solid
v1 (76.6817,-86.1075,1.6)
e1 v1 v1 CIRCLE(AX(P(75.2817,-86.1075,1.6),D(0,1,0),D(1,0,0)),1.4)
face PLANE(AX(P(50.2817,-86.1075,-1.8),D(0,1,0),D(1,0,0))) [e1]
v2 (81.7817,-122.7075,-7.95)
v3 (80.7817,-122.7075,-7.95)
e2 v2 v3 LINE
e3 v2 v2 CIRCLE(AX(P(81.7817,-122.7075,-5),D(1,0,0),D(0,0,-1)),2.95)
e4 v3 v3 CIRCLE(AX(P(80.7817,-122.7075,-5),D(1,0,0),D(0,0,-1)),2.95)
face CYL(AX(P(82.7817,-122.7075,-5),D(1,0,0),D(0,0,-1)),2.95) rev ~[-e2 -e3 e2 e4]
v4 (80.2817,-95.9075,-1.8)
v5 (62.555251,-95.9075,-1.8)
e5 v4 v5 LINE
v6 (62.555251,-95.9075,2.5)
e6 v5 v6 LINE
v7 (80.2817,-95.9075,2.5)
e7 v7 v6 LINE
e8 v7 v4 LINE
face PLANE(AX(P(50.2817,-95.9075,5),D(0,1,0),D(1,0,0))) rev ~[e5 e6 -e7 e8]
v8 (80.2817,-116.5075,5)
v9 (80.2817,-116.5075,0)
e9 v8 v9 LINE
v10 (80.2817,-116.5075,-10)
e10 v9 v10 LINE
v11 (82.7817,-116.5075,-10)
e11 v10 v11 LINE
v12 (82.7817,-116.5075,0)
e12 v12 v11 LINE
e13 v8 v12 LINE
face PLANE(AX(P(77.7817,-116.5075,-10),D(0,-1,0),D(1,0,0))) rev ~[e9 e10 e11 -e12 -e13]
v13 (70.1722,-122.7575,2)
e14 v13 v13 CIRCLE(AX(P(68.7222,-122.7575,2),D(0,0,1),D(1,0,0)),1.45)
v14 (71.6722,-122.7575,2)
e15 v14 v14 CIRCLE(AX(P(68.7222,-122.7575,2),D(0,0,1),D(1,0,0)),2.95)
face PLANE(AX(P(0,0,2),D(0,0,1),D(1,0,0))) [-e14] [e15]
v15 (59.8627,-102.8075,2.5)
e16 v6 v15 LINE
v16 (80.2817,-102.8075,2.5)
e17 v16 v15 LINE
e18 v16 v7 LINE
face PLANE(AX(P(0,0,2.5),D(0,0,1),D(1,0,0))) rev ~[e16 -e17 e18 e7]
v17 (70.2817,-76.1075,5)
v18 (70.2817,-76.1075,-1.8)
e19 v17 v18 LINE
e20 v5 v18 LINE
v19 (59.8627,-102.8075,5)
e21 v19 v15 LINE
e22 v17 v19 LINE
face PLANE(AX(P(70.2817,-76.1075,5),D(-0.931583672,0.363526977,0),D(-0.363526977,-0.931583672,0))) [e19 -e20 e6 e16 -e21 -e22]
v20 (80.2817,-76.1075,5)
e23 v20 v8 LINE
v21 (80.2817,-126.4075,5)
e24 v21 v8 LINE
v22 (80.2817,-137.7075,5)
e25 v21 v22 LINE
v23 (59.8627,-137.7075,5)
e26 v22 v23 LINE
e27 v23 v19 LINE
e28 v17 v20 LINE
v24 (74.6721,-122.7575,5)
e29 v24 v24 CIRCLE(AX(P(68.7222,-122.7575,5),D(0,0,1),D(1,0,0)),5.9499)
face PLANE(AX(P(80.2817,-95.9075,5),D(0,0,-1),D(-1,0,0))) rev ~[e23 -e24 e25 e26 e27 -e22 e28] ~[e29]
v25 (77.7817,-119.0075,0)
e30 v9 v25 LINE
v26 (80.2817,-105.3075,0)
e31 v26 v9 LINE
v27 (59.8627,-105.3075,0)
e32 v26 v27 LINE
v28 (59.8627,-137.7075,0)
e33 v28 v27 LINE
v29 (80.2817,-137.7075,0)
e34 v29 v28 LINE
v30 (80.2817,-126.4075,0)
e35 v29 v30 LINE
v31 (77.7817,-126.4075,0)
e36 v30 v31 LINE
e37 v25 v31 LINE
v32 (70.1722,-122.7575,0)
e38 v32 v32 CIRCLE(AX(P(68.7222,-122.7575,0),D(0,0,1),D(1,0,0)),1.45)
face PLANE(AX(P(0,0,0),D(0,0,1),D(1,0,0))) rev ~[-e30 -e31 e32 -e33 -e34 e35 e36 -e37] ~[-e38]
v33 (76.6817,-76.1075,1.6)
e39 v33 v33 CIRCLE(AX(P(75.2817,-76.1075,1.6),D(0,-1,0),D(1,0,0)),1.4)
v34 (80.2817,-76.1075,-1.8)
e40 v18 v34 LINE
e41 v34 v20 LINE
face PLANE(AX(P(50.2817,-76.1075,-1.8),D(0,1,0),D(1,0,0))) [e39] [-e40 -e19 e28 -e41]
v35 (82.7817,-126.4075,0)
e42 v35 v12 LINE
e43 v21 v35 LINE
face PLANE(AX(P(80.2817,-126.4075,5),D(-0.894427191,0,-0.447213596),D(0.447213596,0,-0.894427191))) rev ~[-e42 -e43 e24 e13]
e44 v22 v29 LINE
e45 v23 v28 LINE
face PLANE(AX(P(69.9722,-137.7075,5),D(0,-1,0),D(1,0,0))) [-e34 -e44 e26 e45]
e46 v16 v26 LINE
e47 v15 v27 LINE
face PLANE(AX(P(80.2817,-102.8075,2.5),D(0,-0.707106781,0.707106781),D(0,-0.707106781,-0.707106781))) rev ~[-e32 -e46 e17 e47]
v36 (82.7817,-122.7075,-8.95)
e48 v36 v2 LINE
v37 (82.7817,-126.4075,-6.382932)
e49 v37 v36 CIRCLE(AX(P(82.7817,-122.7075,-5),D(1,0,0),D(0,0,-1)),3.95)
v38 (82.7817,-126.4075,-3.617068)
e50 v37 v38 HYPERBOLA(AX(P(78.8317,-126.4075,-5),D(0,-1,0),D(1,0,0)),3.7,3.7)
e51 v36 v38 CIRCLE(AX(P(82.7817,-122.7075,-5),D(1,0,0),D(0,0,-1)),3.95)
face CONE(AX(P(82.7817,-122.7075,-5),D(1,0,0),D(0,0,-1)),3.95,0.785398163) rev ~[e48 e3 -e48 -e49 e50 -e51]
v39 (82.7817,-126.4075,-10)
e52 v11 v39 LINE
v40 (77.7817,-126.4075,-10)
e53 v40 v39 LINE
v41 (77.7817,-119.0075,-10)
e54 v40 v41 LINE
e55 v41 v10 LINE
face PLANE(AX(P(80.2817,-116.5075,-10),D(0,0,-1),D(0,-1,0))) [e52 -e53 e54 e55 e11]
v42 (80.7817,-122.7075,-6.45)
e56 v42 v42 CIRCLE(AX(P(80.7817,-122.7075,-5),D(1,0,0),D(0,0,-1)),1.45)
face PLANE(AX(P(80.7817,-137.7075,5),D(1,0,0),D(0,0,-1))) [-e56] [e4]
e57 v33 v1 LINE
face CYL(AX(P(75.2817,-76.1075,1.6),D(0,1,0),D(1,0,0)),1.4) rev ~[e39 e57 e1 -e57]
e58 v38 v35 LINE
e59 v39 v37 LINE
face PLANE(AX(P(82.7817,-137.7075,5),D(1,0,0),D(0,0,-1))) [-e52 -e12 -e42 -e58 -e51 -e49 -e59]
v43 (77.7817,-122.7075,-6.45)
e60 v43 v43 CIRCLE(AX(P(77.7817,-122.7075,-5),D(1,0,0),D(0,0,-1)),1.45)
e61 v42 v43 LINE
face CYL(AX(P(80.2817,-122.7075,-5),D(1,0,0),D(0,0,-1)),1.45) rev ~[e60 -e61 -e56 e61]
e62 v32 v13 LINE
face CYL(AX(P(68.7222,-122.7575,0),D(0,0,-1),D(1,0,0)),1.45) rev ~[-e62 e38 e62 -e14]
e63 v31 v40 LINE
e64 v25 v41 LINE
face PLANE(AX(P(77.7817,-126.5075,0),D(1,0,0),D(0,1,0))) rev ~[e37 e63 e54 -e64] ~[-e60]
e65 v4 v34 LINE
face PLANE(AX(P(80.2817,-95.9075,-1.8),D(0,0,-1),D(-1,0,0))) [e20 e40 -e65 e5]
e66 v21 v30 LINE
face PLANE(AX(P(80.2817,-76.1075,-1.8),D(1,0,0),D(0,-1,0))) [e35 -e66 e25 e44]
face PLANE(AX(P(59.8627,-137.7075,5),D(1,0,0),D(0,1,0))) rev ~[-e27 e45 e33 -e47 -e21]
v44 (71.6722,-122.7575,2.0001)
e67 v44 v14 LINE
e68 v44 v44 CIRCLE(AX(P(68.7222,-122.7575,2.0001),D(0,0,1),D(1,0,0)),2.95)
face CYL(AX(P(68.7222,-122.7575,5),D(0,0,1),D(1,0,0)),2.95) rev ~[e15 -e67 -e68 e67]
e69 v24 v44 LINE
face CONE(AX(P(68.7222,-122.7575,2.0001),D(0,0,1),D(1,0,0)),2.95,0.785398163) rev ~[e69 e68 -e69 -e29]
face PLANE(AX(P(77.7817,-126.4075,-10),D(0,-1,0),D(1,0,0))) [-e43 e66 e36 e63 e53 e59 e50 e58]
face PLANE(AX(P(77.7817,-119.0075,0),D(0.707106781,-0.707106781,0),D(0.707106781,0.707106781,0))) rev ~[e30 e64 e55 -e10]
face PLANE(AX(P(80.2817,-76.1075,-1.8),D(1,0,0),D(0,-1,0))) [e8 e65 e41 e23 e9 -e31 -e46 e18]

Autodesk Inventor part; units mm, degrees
ref_plane "YZ Plane" through (0, 0, 0) normal (1, 0, 0) x (0, 1, 0)
ref_plane "XZ Plane" through (0, 0, 0) normal (0, 1, 0) x (-1, 0, 0)
ref_plane "XY Plane" through (0, 0, 0) normal (0, 0, 1) x (1, 0, 0)
sketch "Esboço1" plane through (0, 0, 0) normal (0, 0, 1) x (1, 0, 0)
  line L0 (80.2817, -126.5075) -> (80.2817, -137.9075)
  line L1 (80.2817, -137.9075) -> (59.6627, -137.9075)
  line L2 (77.7817, -126.5075) -> (80.2817, -126.5075)
  line L3 (77.7817, -119.0075) -> (77.7817, -126.5075)
  line L4 (59.6627, -137.9075) -> (59.6627, -102.6075)
  line L5 (80.2817, -116.5075) -> (77.7817, -119.0075)
  line L6 (59.6627, -102.6075) -> (80.2817, -102.6075)
  line L7 (80.2817, -105.1075) -> (80.2817, -116.5075)
  line L8 (80.2817, -102.6075) -> (80.2817, -105.1075)
  line L9 (77.7817, -122.7575) -> (59.6627, -122.7575)
  circle A0 centre (68.7222, -122.7575) radius 1.45
  point P0 (0, 0)
  dimension "d65" = 2.9
extrude "Extrusão1" add sketch "Esboço1" along normal blind 5 contours L0 L1 L4 L9 A0 L3 L2 | L9 A0 L4 L6 L8 L7 L5 L3
sketch "Esboço2" plane through (0, 0, 5) normal (0, 0, 1) x (1, 0, 0)
  line L0 (69.9722, -137.7075) -> (80.6667, -137.7075)
  line L1 (80.6667, -137.7075) -> (80.6667, -138.3178)
  line L2 (80.6667, -138.3178) -> (69.9722, -138.3178)
  line L3 (69.9722, -137.7075) -> (59.8627, -137.7075)
  line L4 (59.358, -137.7075) -> (59.358, -138.3178)
  line L5 (59.358, -138.3178) -> (69.9722, -138.3178)
  line L6 (69.9722, -102.8075) -> (80.6667, -102.8075)
  line L7 (80.6667, -102.8075) -> (80.6667, -102.3974)
  line L8 (80.6667, -102.3974) -> (69.9722, -102.3974)
  line L9 (69.9722, -102.8075) -> (59.8627, -102.8075)
  line L10 (59.358, -102.8075) -> (59.358, -102.3974)
  line L11 (59.358, -102.3974) -> (69.9722, -102.3974)
  line L12 (59.358, -102.6075) -> (59.358, -138.3178)
  line L13 (59.358, -138.3178) -> (59.8627, -138.3178)
  line L14 (59.8627, -137.7075) -> (59.8627, -102.8075)
  point P0 (0, 0)
extrude "Extrusão2" cut sketch "Esboço2" against normal through all
sketch "Esboço3" plane through (80.2817, -116.5075, 5) normal (1, 0, 0) x (0, 0, -1)
  line L0 (5, 0) -> (5, 13.7) projected
  line L1 (5, 13.7) -> (2.5, 13.7)
  line L2 (5, 13.7) -> (0, 13.7) projected
  line L3 (5, 13.7) -> (5, 11.2)
  line L4 (2.5, 13.7) -> (5, 11.2)
  point P0 (5, 116.5075)
  dimension "d15" = 2.5
  dimension "d16" = 2.5
extrude "Extrusão3" cut sketch "Esboço3" against normal through all
sketch "Esboço4" plane through (0, 0, 0) normal (0, 0, -1) x (-1, 0, 0)
  line L0 (-77.7817, -119.0075) -> (-80.2817, -116.5075) projected
  line L1 (-77.7817, -126.5075) -> (-77.7817, -119.0075) projected
  line L2 (-80.2817, -116.5075) -> (-77.7817, -119.0075)
  line L3 (-77.7817, -119.0075) -> (-77.7817, -126.5075)
  line L4 (-77.7817, -126.5075) -> (-80.2817, -126.5075)
  line L5 (-80.2817, -126.5075) -> (-80.2817, -116.5075)
  point P0 (0, 0)
extrude "Extrusão4" add sketch "Esboço4" along normal blind 10
sketch "Esboço5" plane through (0, 0, -10) normal (0, 0, -1) x (-1, 0, 0)
  line L0 (-77.7817, -119.0075) -> (-80.2817, -116.5075) projected
  line L1 (-80.2817, -116.5075) -> (-80.2817, -116.6075)
  line L2 (-80.2817, -116.6075) -> (-77.7817, -119.1075)
  line L3 (-80.2817, -116.5075) -> (-80.2817, -126.5075) projected
  line L4 (-80.2817, -116.5075) -> (-80.2817, -116.1602)
  line L5 (-80.2817, -116.5075) -> (-80.2817, -105.3075) projected
  line L6 (-80.2817, -116.1602) -> (-77.7817, -116.1602)
  line L7 (-77.7817, -116.1602) -> (-77.7817, -119.1075)
  line L8 (-80.2817, -126.5075) -> (-80.2817, -126.4075)
  line L9 (-80.2817, -126.4075) -> (-77.6383, -126.4075)
  line L10 (-77.6383, -126.4075) -> (-77.6383, -126.5963)
  line L11 (-77.6383, -126.5963) -> (-80.2817, -126.5963)
  line L12 (-80.2817, -126.5963) -> (-80.2817, -126.4075)
  point P0 (0, 0)
  dimension "d26" = 0.1
extrude "Extrusão5" cut sketch "Esboço5" against normal blind 10 contours L0 L4 L6 L7 | L9 L10 L11 L12 L3
sketch "Esboço6" plane through (0, 0, 5) normal (0, 0, 1) x (1, 0, 0)
  line L0 (80.2817, -126.5075) -> (77.7817, -126.5075) projected
  line L1 (80.2817, -126.5075) -> (77.7817, -126.5075)
  line L2 (77.7817, -119.0075) -> (80.2817, -116.5075) projected
  line L3 (77.7817, -126.5075) -> (77.7817, -119.0075)
  line L4 (77.7817, -119.0075) -> (80.2817, -116.5075)
  line L5 (80.2817, -116.5075) -> (80.2817, -126.5075)
  point P0 (0, 0)
extrude "Extrusão6" add sketch "Esboço6" against normal blind 5
sketch "Esboço7" plane through (80.2817, -137.7075, 5) normal (1, 0, 0) x (0, 0, -1)
  line L0 (5, 21.2) -> (15, 21.2) projected
  line L1 (15, 21.2) -> (15, 18.7)
  line L2 (15, 21.2) -> (15, 11.3) projected
  line L3 (5, 18.7) -> (5, 21.2) projected
  line L4 (15, 18.7) -> (5, 18.7)
  line L5 (5, 18.7) -> (5, 21.2)
  line L6 (5, 21.2) -> (15, 21.2)
  line L7 (15, 11.3) -> (5, 11.3) projected
  line L8 (5, 11.3) -> (15, 18.7)
  circle A0 centre (10, 15) radius 1.45
  point P0 (5, 137.7075)
  dimension "d31" = 2.5
  dimension "d32" = 2.9
extrude "Extrusão7" cut sketch "Esboço7" against normal blind 5 contours A0 L8 | L8 A0
sketch "Esboço8" plane through (0, 0, 5) normal (0, 0, 1) x (1, 0, 0)
  line L0 (80.2817, -137.7075) -> (80.2817, -102.8075) projected
  line L1 (80.2817, -102.8075) -> (80.2817, -95.9075)
  line L2 (80.2817, -95.9075) -> (50.2817, -95.9075)
  line L3 (50.2817, -95.9075) -> (50.2817, -102.8075)
  line L4 (80.2817, -102.8075) -> (59.8627, -102.8075) projected
  line L5 (50.2817, -102.8075) -> (80.2817, -102.8075)
  point P0 (0, 0)
  dimension "d35" = 6.9
  dimension "d36" = 30
extrude "Extrusão8" add sketch "Esboço8" against normal blind 2.5
sketch "Esboço10" plane through (50.2817, -95.9075, 5) normal (0, 1, 0) x (1, 0, 0)
  line L0 (30, 0) -> (30, 2.5) projected
  line L1 (30, 5) -> (30, 2.5) projected
  line L2 (30, 0) -> (30, 2.5)
  line L3 (30, 2.5) -> (30, 6.8)
  line L4 (30, 6.8) -> (0, 6.8)
  line L5 (0, 0) -> (0, 2.5) projected
  line L6 (0, 6.8) -> (0, 0)
  line L7 (0, 0) -> (30, 0)
  point P0 (-50.2817, 5)
  dimension "d39" = 4.3
extrude "Extrusão9" add sketch "Esboço10" along normal blind 2.5
sketch "Esboço11" plane through (50.2817, -93.4075, 5) normal (0, 1, 0) x (1, 0, 0)
  line L0 (30, 2.5) -> (30, 6.8) projected
  line L1 (30, 5) -> (30, 2.5) projected
  line L2 (30, 6.8) -> (30, 2.5)
  line L3 (0, 0) -> (0, 2.5) projected
  line L4 (30, 2.5) -> (0, 2.5)
  line L5 (0, 6.8) -> (0, 2.5) projected
  line L6 (0, 2.5) -> (0, 6.8)
  line L7 (0, 6.8) -> (30, 6.8)
  line L8 (0, 2.5) -> (30, 2.5)
  line L9 (30, 2.5) -> (30, 0)
  line L10 (30, 0) -> (0, 0)
  line L11 (0, 0) -> (0, 2.5)
  point P0 (-50.2817, 5)
  dimension "d42" = 4.3
extrude "Extrusão10" add sketch "Esboço11" along normal blind 12.3
sketch "Esboço12" plane through (80.2817, -95.9075, -1.8) normal (0, 0, -1) x (-1, 0, 0)
  line L0 (0, 14.8) -> (30, 14.8) projected
  line L1 (0, 14.8) -> (30, 14.8)
  line L2 (30, 14.8) -> (30, 19.8)
  line L3 (30, 19.8) -> (0, 19.8)
  line L4 (0, 19.8) -> (0, 14.8)
  point P0 (80.2817, 95.9075)
  dimension "d45" = 5
extrude "Extrusão11" add sketch "Esboço12" against normal blind 6.8
sketch "Esboço14" plane through (80.2817, -137.7075, 5) normal (1, 0, 0) x (0, 0, -1)
  line L0 (5, 18.7) -> (5, 21.2) projected
  line L1 (15, 21.2) -> (15, 11.3) projected
  line L2 (5, 21.2) -> (15, 21.2)
  line L3 (15, 21.2) -> (15, 11.3)
  line L4 (15, 11.3) -> (5, 11.3)
  line L5 (5, 11.3) -> (5, 21.2)
  circle A0 centre (10, 15) radius 1.45 projected
  circle A1 centre (10, 15) radius 1.45
  point P0 (5, 137.7075)
extrude "Extrusão13" add sketch "Esboço14" along normal blind 2.5
sketch "Esboço15" plane through (77.7817, -126.4075, -10) normal (0, -1, 0) x (1, 0, 0)
  line L0 (5, 10) -> (5, 0) projected
  line L1 (2.5, 15) -> (2.5, 10) projected
  line L2 (5, 10) -> (2.5, 10)
  line L3 (2.5, 10) -> (2.5, 15)
  line L4 (2.5, 15) -> (5, 10)
  point P0 (-77.7817, 10)
extrude "Extrusão14" add sketch "Esboço15" against normal blind 9.9
sketch "Esboço16" plane through (50.2817, -76.1075, -1.8) normal (0, 1, 0) x (1, 0, 0)
  line L0 (30, 0) -> (0, 0) projected
  line L1 (15, 0) -> (15, -6.8)
  line L2 (9.581, -6.8) -> (30, -6.8) projected
  line L3 (15, -3.4) -> (30, -3.4)
  line L4 (30, -3.4) -> (25, -3.4)
  circle A0 centre (25, -3.4) radius 1.4
  point P0 (-50.2817, -1.8)
  dimension "d92" = 5
  dimension "d99" = 2.8
extrude "Extrusão15" cut sketch "Esboço16" against normal blind 10
sketch "Esboço18" plane through (0, 0, 5) normal (0, 0, 1) x (1, 0, 0)
  line L0 (80.2817, -116.5075) -> (80.2817, -76.1075) projected
  line L1 (80.2817, -76.1075) -> (70.2817, -76.1075)
  line L2 (50.2817, -76.1075) -> (80.2817, -76.1075) projected
  line L3 (80.2817, -102.8075) -> (59.8627, -102.8075) projected
  line L4 (70.2817, -76.1075) -> (59.8627, -102.8075)
  line L5 (59.8627, -102.8075) -> (80.2817, -102.8075)
  line L6 (80.2817, -102.8075) -> (80.2817, -76.1075)
  line L7 (70.2817, -76.1075) -> (50.2817, -76.1075)
  line L8 (50.2817, -76.1075) -> (50.2817, -102.8075) projected
  line L9 (50.2817, -102.8075) -> (59.8627, -102.8075)
  line L10 (50.2817, -102.8075) -> (50.2817, -76.1075)
  point P0 (0, 0)
  dimension "d96" = 10
extrude "Extrusão16" cut sketch "Esboço18" against normal through all contours L9 L8 L2 L4
sketch "Esboço19" plane through (0, 0, 5) normal (0, 0, 1) x (1, 0, 0)
  circle A0 centre (68.7222, -122.7575) radius 1.45 projected
  circle A1 centre (68.7222, -122.7575) radius 1.45
  circle A2 centre (68.7222, -122.7575) radius 2.95
  point P0 (0, 0)
  dimension "d100" = 5.9
extrude "Extrusão17" cut sketch "Esboço19" against normal blind 3
chamfer "Chanfro9" distance 3 angle 45 1 edges at (65.7722, -122.7575, 5)
sketch "Esboço20" plane through (82.7817, -137.7075, 5) normal (1, 0, 0) x (0, 0, -1)
  circle A0 centre (10, 15) radius 1.45 projected
  circle A1 centre (10, 15) radius 1.45
  circle A2 centre (10, 15) radius 2.95
  point P0 (5, 137.7075)
  dimension "d106" = 5.9
extrude "Extrusão18" cut sketch "Esboço20" against normal blind 2
chamfer "Chanfro10" distance 1 angle 45 1 edges at (82.7817, -122.7075, -2.05)
properties part number "suporte_esquerdo"
